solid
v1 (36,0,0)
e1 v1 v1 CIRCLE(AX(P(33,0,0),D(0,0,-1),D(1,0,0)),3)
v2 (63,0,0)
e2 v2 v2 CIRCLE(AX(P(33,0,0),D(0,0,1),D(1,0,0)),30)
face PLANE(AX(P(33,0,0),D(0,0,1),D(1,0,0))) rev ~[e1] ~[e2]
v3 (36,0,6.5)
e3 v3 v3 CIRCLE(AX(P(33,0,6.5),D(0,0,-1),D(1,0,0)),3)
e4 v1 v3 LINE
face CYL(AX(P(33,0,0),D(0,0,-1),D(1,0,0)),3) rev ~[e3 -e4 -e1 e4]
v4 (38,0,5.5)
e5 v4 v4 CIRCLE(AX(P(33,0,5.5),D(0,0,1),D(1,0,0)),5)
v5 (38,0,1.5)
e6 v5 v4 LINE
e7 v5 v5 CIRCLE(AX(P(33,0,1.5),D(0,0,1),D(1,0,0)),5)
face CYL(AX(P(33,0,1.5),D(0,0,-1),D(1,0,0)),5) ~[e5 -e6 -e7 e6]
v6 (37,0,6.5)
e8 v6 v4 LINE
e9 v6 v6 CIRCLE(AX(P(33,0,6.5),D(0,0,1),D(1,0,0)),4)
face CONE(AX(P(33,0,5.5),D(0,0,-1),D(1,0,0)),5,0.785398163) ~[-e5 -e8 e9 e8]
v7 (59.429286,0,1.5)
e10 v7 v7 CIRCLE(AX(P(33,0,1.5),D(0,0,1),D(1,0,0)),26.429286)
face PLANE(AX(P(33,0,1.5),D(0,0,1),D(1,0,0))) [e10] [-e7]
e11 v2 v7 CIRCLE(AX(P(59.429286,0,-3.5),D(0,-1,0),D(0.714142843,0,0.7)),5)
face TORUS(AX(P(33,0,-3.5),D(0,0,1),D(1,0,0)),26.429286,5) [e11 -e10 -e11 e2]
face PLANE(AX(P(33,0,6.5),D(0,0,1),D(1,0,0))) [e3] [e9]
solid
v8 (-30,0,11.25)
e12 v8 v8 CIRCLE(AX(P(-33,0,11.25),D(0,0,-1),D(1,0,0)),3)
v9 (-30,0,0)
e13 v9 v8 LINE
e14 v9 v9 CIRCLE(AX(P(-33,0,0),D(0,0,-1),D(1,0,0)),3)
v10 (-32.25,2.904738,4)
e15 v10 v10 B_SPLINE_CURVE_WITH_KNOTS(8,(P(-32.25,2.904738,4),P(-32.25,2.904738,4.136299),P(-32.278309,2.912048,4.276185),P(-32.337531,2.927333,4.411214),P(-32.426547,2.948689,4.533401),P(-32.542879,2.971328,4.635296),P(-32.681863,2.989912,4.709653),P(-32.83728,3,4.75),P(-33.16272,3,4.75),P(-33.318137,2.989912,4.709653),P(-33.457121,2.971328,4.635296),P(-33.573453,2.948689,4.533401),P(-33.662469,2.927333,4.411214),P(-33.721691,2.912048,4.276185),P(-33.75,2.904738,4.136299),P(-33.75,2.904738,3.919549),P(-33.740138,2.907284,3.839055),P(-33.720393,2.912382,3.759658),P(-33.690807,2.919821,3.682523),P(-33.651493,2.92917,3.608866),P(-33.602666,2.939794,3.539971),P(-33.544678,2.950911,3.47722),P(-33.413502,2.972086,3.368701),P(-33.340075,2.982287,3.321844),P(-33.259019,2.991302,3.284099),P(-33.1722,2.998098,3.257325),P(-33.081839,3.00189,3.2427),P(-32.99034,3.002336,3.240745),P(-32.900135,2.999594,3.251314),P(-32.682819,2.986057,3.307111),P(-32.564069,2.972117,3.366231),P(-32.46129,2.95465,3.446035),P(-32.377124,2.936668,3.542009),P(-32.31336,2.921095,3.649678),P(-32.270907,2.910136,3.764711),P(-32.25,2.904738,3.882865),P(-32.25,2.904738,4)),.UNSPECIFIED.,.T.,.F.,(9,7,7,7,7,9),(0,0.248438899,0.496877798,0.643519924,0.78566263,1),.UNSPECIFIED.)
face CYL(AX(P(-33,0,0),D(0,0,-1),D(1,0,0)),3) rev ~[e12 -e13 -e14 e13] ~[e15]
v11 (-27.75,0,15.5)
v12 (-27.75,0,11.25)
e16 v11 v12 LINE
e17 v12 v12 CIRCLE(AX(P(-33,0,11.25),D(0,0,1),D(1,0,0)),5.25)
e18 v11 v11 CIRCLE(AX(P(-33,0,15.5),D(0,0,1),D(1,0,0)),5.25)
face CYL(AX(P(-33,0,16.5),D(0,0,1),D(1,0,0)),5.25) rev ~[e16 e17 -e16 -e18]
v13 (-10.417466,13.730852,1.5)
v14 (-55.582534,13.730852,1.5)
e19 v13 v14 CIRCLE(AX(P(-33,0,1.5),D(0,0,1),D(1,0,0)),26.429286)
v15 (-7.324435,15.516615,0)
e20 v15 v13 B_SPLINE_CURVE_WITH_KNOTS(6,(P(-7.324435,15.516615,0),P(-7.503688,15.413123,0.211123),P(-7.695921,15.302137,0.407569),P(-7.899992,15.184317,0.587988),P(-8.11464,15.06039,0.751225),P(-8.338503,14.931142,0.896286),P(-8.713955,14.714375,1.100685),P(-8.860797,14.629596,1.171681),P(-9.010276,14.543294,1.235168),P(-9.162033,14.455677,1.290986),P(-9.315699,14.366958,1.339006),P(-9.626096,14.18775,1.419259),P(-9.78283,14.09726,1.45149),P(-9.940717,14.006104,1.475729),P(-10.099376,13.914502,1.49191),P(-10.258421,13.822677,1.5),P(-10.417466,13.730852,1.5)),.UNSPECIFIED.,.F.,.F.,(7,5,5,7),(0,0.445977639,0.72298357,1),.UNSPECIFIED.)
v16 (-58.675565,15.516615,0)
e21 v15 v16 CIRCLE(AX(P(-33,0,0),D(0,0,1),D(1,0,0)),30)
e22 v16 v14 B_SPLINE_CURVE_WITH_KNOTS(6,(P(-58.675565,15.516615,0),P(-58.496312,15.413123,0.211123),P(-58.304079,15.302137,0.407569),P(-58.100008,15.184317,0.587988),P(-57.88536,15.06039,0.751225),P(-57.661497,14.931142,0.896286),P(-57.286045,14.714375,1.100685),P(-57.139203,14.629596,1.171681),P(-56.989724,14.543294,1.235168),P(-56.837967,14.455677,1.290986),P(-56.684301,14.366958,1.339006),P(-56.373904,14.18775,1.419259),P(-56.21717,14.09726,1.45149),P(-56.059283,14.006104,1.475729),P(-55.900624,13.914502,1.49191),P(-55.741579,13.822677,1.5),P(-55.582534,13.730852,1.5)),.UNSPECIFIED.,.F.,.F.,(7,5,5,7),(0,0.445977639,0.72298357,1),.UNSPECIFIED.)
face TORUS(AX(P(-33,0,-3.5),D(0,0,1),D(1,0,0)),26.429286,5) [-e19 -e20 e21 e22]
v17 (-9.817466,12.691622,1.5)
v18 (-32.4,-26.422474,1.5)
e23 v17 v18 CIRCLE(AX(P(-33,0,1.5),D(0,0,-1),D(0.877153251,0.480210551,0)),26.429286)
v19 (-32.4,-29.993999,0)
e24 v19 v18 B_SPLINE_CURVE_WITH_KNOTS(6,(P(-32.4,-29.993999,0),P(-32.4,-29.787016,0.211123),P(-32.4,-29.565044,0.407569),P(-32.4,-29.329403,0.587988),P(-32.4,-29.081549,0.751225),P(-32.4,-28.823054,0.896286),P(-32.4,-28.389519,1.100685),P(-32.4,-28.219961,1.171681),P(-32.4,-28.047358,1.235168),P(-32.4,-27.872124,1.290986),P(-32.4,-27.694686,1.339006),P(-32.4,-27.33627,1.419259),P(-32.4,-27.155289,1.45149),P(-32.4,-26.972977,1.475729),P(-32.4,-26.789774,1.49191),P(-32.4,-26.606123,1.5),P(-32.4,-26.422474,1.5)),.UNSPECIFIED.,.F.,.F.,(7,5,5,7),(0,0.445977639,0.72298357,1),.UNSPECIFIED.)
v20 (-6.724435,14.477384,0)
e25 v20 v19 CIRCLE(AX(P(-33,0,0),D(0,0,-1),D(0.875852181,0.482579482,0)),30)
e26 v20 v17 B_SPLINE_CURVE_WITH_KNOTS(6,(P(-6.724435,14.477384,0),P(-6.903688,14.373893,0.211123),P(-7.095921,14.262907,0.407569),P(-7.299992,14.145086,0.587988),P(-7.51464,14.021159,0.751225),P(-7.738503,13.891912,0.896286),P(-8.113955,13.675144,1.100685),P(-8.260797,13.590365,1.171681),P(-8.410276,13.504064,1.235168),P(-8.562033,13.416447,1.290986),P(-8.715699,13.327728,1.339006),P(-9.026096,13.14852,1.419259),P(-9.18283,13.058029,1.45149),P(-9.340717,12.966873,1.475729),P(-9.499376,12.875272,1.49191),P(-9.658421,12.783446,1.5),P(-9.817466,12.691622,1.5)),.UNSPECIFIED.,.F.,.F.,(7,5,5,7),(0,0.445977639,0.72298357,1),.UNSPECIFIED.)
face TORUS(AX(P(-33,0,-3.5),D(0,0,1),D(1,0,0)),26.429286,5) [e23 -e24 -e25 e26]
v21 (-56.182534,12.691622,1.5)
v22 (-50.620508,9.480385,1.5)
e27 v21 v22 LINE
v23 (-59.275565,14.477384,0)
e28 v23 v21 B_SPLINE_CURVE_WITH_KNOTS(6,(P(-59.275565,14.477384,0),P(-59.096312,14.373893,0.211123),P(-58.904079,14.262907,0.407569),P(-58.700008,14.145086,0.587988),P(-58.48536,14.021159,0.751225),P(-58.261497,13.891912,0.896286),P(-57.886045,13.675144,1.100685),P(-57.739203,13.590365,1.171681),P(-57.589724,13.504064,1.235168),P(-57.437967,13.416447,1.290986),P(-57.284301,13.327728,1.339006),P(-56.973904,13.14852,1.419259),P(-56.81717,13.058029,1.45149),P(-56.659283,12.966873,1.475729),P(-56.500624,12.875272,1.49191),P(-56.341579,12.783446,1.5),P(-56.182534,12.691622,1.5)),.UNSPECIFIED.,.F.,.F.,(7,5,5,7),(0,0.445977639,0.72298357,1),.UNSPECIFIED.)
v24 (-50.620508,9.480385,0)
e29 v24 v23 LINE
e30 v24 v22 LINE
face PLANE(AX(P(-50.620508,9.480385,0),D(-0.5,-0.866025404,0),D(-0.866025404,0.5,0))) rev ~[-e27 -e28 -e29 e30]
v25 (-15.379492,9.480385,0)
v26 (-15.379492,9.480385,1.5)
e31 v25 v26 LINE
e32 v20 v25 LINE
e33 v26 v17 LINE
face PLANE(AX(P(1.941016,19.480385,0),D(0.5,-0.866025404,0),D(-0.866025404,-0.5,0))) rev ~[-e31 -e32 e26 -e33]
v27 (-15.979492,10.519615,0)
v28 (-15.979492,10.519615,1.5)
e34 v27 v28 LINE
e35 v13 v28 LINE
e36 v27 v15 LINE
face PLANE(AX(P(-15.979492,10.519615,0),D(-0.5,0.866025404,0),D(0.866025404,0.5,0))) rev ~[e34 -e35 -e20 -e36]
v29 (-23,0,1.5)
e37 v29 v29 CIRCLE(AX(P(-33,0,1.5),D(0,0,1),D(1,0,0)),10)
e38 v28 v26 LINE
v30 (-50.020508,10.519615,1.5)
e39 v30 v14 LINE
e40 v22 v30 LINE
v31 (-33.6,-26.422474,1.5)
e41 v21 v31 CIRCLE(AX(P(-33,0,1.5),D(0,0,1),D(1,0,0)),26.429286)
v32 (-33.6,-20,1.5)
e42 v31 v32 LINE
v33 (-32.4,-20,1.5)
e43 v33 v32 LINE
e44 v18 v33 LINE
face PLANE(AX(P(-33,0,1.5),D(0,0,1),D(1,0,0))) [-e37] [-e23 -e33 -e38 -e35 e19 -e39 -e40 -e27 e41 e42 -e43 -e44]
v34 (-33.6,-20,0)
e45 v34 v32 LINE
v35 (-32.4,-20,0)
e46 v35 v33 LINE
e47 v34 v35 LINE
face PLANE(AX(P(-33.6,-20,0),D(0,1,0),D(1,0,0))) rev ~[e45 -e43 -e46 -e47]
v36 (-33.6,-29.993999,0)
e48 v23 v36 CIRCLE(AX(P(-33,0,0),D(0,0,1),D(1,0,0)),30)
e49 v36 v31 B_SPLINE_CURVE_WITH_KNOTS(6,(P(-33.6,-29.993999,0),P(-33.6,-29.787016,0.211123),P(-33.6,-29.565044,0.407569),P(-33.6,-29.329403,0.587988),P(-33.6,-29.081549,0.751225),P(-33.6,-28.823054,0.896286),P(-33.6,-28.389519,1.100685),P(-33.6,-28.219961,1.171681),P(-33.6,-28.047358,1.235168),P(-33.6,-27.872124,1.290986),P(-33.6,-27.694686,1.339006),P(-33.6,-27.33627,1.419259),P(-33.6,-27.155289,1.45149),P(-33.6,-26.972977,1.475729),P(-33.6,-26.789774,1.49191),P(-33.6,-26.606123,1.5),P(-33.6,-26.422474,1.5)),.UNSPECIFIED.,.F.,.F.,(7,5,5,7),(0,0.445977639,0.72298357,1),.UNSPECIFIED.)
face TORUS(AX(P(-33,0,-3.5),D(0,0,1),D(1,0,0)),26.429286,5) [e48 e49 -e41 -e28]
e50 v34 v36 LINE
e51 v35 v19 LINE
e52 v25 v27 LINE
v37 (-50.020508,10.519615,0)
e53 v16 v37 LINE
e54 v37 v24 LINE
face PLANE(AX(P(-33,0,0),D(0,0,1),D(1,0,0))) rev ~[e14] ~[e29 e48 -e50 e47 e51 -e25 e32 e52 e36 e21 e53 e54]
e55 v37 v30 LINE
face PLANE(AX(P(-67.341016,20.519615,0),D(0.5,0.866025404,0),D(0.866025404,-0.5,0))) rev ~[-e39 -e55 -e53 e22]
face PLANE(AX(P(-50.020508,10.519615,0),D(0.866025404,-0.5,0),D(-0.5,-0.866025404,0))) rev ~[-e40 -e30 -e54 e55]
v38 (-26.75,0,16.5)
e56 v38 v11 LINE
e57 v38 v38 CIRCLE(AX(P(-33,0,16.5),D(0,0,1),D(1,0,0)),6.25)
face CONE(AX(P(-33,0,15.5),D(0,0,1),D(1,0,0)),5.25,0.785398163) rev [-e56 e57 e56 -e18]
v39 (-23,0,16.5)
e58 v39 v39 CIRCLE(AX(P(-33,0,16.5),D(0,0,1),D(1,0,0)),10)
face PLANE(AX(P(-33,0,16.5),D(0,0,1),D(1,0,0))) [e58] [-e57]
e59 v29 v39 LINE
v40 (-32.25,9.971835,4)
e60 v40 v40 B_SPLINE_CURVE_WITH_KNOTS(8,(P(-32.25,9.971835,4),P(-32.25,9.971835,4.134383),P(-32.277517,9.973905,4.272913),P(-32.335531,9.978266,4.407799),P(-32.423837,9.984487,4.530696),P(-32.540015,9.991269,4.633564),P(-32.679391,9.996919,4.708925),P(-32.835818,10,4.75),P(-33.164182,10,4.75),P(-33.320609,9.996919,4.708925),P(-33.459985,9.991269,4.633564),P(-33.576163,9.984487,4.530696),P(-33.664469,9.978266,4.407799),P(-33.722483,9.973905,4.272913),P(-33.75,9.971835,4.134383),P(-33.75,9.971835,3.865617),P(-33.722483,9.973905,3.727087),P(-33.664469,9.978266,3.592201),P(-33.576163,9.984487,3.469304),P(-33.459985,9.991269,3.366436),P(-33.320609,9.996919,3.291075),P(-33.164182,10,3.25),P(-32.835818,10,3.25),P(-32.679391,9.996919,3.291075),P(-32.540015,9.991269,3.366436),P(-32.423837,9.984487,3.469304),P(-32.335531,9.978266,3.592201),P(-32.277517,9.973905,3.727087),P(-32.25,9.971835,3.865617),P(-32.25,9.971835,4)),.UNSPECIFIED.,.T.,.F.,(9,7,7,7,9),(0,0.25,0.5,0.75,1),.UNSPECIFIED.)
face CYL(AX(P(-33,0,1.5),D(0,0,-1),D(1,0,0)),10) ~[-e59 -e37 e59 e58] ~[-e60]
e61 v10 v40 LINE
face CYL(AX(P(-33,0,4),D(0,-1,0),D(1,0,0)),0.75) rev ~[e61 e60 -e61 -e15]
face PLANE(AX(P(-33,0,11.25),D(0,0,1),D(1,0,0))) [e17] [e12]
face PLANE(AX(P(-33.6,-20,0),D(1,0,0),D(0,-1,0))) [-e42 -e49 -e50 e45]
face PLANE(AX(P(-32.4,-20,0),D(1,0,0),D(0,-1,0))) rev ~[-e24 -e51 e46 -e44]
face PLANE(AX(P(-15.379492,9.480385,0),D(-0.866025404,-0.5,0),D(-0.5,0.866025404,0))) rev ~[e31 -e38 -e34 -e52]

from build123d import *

# Parameters (mm, degrees)
F0_R       = 30
F1_DEPTH   = 1.5
F3_R       = 10
F4_DEPTH   = 15
F5_R       = 5
F6_DEPTH   = 5
F7_R       = 5.25
F8_DEPTH   = 5.25
F9_R       = 3
F11_DEPTH  = 25
F10_R      = 3
F12_DEPTH  = 25
F13_R      = 0.75
F14_DEPTH  = 30.001
F15_W      = 1.2
F15_H      = 20
F16_DEPTH  = 25
F17_SIZE   = 1
F17_2_SIZE = 1


# Not quite as in the source:
# - a fillet or chamfer that OpenCascade refuses, or shapes differently, is made with other operations: its cross-section is extruded or revolved along the edge and cut away or added


with BuildPart() as f1:
    # F0 (on Top) → F1 (new body)
    with BuildSketch(Plane.XY):
        with Locations((-33, 0)):
            Circle(F0_R)
    extrude(amount=F1_DEPTH)

    # F2: fillet of radius 5 on 1 edges, made by hand

    # F2_s1 → F2_t2 (revolve, cut)
    with BuildSketch(Plane.XZ):
        with BuildLine():
            ThreePointArc((-3, 0), (-4.6342225412, 1.1097722286), (-6.5707142143, 1.5))
            Line((-6.5707142143, 1.5), (-3, 1.5))
            Line((-3, 1.5), (-3, 0))
        make_face()
    revolve(axis=Axis((-33, 0, 1.5), (0, 0, 1)), mode=Mode.SUBTRACT)

    # F3 (on face) → F4 (join)
    with BuildSketch(Plane.XY.offset(1.5)):
        with Locations((-33, 0)):
            Circle(F3_R)
    extrude(amount=F4_DEPTH)

    # F7 (on face) → F8 (cut)
    with BuildSketch(Plane.XY.offset(16.5)):
        with Locations((-33, 0)):
            Circle(F7_R)
    extrude(amount=-F8_DEPTH, mode=Mode.SUBTRACT)

    # F10 (on face) → F12 (cut)
    with BuildSketch(Plane(origin=(0, 0, 0), x_dir=(1, 0, 0), z_dir=(0, 0, -1))):
        with Locations((-33, 0)):
            Circle(F10_R)
    extrude(amount=-F12_DEPTH, mode=Mode.SUBTRACT)

    # F13 (on Front) → F14 (cut, through all)
    with BuildSketch(Plane.XZ):
        with Locations((-33, 4)):
            Circle(F13_R)
    extrude(amount=-F14_DEPTH, mode=Mode.SUBTRACT)

    # F15 (on face) → F16 (cut)
    with BuildSketch(Plane(origin=(0, 0, 0), x_dir=(1, 0, 0), z_dir=(0, 0, -1))):
        with Locations((-33, 30)):
            Rectangle(F15_W, F15_H)
        Polygon((-67.3410161514, -20.5196152423), (-50.0205080757, -10.5196152423), (-50.6205080757, -9.4803847577), (-67.9410161514, -19.4803847577), align=None)
        Polygon((1.9410161514, -19.4803847577), (-15.3794919243, -9.4803847577), (-15.9794919243, -10.5196152423), (1.3410161514, -20.5196152423), align=None)
    extrude(amount=-F16_DEPTH, mode=Mode.SUBTRACT)

    # F17
    f17_edges = [f1.edges().sort_by_distance(p)[0] for p in [
        (-38.25, 0, 16.5),
    ]]
    chamfer(f17_edges, length=F17_SIZE)


with BuildPart() as f1b:
    # F0 (on Top) → F1, piece 2 (new body)
    with BuildSketch(Plane.XY):
        with Locations((33, 0)):
            Circle(F0_R)
    extrude(amount=F1_DEPTH)

    # F2#2: fillet of radius 5 on 1 edges, made by hand

    # F2_2_s1 → F2_2_t2 (revolve, cut)
    with BuildSketch(Plane.XZ):
        with BuildLine():
            ThreePointArc((63, 0), (61.3657774588, 1.1097722286), (59.4292857857, 1.5))
            Line((59.4292857857, 1.5), (63, 1.5))
            Line((63, 1.5), (63, 0))
        make_face()
    revolve(axis=Axis((33, 0, 1.5), (0, 0, 1)), mode=Mode.SUBTRACT)

    # F5 (on face) → F6 (join)
    with BuildSketch(Plane.XY.offset(1.5)):
        with Locations((33, 0)):
            Circle(F5_R)
    extrude(amount=F6_DEPTH)

    # F9 (on face) → F11 (cut)
    with BuildSketch(Plane(origin=(0, 0, 0), x_dir=(1, 0, 0), z_dir=(0, 0, -1))):
        with Locations((33, 0)):
            Circle(F9_R)
    extrude(amount=-F11_DEPTH, mode=Mode.SUBTRACT)

    # F17#2
    f17_2_edges = [f1b.edges().sort_by_distance(p)[0] for p in [
        (28, 0, 6.5),
    ]]
    chamfer(f17_2_edges, length=F17_2_SIZE)


solid = Compound([f1.part, f1b.part])
